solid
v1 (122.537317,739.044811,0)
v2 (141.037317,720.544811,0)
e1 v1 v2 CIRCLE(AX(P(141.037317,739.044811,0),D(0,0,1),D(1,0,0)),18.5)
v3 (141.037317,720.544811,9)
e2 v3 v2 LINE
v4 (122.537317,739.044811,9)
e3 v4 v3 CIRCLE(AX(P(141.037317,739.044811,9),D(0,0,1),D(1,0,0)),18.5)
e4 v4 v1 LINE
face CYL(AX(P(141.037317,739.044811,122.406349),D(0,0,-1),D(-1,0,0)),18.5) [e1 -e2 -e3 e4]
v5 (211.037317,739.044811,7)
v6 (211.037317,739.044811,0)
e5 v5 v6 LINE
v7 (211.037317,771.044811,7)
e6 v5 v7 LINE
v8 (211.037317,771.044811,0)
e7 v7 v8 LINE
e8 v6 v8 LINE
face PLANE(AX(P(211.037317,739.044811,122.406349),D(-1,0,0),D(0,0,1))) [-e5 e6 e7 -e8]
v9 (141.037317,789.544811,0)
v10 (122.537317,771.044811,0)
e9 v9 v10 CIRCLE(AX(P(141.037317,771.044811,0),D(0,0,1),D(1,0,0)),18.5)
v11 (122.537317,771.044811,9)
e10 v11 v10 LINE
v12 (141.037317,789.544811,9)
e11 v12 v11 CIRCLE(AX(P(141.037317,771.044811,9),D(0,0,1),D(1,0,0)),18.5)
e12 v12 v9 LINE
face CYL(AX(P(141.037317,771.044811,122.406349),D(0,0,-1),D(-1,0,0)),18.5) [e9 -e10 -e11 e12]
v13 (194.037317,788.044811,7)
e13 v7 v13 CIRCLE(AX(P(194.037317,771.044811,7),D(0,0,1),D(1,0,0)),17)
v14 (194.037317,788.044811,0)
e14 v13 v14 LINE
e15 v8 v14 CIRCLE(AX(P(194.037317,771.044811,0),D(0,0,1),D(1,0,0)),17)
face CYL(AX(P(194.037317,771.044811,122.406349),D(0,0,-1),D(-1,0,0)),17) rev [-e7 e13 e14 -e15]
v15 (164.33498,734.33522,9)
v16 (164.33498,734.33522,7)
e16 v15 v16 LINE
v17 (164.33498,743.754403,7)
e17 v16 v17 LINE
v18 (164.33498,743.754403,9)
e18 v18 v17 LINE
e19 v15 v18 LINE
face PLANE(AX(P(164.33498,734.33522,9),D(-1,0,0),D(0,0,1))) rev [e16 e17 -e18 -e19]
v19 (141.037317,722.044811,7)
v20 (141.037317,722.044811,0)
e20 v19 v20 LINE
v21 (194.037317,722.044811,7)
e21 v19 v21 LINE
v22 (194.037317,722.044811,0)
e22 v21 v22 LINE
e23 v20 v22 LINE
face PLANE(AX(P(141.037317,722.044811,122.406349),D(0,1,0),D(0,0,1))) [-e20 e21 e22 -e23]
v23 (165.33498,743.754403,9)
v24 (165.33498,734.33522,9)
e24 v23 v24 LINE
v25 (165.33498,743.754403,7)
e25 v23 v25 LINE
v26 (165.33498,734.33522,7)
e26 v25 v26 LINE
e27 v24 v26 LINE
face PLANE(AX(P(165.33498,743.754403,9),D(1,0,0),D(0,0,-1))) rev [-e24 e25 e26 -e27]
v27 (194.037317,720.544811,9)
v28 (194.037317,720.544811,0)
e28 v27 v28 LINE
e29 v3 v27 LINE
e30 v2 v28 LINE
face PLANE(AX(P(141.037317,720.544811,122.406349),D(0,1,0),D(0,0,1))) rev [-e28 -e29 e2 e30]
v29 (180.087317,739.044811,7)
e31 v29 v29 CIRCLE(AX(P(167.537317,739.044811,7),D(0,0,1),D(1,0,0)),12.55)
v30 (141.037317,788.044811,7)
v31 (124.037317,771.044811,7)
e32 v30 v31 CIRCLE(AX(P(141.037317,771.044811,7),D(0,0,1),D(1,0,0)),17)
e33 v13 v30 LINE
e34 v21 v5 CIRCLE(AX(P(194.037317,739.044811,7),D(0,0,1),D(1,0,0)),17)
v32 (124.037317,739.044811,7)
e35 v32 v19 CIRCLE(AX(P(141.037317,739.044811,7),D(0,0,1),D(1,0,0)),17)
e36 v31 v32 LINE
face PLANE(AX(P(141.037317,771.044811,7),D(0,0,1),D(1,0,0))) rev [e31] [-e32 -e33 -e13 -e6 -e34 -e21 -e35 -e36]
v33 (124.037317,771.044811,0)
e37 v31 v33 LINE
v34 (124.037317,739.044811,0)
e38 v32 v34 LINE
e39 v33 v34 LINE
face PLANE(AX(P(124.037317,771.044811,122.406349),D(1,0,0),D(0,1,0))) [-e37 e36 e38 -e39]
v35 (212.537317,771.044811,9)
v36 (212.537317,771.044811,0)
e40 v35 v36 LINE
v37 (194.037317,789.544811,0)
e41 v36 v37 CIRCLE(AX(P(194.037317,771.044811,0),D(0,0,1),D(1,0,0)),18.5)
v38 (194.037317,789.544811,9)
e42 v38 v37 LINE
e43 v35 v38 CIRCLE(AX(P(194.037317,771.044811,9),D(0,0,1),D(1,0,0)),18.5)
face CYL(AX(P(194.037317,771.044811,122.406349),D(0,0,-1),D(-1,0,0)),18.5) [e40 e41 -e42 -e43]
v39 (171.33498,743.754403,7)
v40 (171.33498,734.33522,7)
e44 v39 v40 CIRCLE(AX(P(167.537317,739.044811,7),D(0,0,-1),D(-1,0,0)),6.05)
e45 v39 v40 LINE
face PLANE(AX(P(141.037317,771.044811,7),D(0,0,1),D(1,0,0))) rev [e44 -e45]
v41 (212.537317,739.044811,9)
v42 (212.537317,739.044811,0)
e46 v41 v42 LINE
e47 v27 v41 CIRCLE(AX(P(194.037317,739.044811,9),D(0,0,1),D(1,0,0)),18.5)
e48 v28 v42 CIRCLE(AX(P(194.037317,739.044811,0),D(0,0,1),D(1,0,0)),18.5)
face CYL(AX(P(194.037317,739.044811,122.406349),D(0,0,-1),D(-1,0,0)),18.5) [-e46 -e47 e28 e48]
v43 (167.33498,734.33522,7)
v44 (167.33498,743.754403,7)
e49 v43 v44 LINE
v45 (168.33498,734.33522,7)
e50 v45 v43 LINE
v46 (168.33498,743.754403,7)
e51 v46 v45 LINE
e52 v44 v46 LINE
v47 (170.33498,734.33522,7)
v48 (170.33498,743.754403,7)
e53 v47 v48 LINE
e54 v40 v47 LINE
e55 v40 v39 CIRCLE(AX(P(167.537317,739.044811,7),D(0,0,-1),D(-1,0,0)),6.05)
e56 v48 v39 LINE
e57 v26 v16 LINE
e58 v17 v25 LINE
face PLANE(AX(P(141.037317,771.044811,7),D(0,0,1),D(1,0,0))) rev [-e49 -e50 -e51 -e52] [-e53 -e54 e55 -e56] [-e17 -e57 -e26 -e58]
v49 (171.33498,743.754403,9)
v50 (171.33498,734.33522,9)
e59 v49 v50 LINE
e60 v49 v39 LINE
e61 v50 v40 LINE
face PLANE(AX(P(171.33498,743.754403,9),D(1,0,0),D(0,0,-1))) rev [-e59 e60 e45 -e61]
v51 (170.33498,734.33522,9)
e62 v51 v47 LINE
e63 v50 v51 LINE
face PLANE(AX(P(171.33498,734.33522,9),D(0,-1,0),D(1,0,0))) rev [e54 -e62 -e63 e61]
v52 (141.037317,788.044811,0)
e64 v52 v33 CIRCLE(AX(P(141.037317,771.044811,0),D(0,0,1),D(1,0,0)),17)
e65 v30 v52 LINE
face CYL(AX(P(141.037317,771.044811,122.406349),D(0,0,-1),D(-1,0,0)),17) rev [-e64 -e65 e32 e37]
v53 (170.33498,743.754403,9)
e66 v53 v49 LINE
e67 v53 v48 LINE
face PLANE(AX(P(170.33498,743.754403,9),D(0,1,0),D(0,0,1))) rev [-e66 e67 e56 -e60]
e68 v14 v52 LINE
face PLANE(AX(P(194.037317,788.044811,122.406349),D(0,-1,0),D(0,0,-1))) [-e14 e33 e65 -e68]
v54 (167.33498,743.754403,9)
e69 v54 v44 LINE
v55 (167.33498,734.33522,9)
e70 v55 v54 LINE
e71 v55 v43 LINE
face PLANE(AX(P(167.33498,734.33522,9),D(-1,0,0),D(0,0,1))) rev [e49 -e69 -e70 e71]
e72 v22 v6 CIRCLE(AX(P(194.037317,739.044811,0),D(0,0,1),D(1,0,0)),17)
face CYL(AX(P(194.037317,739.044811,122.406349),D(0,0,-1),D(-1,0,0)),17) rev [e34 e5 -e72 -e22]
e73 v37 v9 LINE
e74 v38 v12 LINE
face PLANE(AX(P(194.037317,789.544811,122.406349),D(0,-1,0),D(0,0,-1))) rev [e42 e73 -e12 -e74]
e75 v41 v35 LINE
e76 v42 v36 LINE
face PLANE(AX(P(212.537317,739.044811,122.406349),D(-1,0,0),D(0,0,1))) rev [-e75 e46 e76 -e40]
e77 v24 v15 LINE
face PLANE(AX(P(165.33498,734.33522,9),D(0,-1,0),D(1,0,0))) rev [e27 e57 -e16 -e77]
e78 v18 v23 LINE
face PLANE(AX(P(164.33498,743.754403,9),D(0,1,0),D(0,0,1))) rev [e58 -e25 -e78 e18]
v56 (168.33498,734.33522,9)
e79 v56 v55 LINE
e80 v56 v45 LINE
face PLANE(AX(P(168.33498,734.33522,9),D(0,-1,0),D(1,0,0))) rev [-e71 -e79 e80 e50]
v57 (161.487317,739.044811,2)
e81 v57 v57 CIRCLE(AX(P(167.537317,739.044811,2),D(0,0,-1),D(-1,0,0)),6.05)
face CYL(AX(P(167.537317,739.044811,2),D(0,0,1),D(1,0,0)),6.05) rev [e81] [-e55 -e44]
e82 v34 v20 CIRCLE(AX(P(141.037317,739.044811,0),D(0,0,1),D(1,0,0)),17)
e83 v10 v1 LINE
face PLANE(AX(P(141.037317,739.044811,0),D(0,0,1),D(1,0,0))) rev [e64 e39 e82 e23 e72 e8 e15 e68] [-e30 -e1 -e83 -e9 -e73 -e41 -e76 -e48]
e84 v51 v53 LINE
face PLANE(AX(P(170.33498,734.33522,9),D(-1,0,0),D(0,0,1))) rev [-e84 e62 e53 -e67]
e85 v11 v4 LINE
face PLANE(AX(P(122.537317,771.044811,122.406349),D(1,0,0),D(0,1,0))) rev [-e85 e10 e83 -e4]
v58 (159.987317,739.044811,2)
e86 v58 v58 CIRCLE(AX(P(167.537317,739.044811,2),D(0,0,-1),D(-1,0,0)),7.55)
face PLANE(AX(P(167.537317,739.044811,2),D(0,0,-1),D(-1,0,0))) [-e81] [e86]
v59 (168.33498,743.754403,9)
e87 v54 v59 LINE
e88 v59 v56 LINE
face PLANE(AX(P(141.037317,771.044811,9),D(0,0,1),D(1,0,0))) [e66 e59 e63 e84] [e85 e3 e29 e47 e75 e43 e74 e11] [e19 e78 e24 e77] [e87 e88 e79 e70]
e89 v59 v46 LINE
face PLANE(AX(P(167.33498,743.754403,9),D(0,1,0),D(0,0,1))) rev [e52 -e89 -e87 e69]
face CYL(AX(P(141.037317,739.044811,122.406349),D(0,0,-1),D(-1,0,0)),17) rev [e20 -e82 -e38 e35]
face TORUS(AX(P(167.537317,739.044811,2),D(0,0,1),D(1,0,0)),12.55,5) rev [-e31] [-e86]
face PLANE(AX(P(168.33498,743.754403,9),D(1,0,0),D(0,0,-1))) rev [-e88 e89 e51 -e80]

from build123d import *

# Parameters (mm, degrees)
EXTRUDE_THIN1_DEPTH = 7
BOSS_EXTRUDE1_DEPTH = 2
SKETCH3_R           = 7.55
SKETCH3_R_2         = 6.05
EXTRUDE_THIN2_DEPTH = 5
FILLET1_R           = 5
SKETCH4_W           = 1
SKETCH4_H           = 9.419182822
CUT_EXTRUDE1_DEPTH  = 818.680940253


with BuildPart() as part:
    # Sketch1 → Extrude-Thin1 (new body)
    with BuildSketch(Plane.XY):
        with BuildLine():
            Line((122.537316884, 771.044811258), (122.537316884, 739.044811258))
            ThreePointArc((122.537316884, 739.044811258), (127.955841432, 725.963335806), (141.037316884, 720.544811258))
            Line((141.037316884, 720.544811258), (194.037316884, 720.544811258))
            ThreePointArc((194.037316884, 720.544811258), (207.118792336, 725.963335806), (212.537316884, 739.044811258))
            Line((212.537316884, 739.044811258), (212.537316884, 771.044811258))
            ThreePointArc((212.537316884, 771.044811258), (207.118792336, 784.12628671), (194.037316884, 789.544811258))
            Line((194.037316884, 789.544811258), (141.037316884, 789.544811258))
            ThreePointArc((141.037316884, 789.544811258), (127.955841432, 784.12628671), (122.537316884, 771.044811258))
        make_face()
        with BuildLine():
            Line((124.037316884, 771.044811258), (124.037316884, 739.044811258))
            ThreePointArc((124.037316884, 739.044811258), (129.016501604, 727.023995978), (141.037316884, 722.044811258))
            Line((141.037316884, 722.044811258), (194.037316884, 722.044811258))
            ThreePointArc((194.037316884, 722.044811258), (206.058132165, 727.023995978), (211.037316884, 739.044811258))
            Line((211.037316884, 739.044811258), (211.037316884, 771.044811258))
            ThreePointArc((211.037316884, 771.044811258), (206.058132165, 783.065626538), (194.037316884, 788.044811258))
            Line((194.037316884, 788.044811258), (141.037316884, 788.044811258))
            ThreePointArc((141.037316884, 788.044811258), (129.016501604, 783.065626538), (124.037316884, 771.044811258))
        make_face(mode=Mode.SUBTRACT)
    extrude(amount=EXTRUDE_THIN1_DEPTH)

    # Sketch2 → Boss-Extrude1 (add)
    with BuildSketch(Plane.XY.offset(7)):
        with BuildLine():
            Line((122.537316884, 771.044811258), (122.537316884, 739.044811258))
            ThreePointArc((122.537316884, 739.044811258), (127.955841432, 725.963335806), (141.037316884, 720.544811258))
            Line((141.037316884, 720.544811258), (194.037316884, 720.544811258))
            ThreePointArc((194.037316884, 720.544811258), (207.118792336, 725.963335806), (212.537316884, 739.044811258))
            Line((212.537316884, 739.044811258), (212.537316884, 771.044811258))
            ThreePointArc((212.537316884, 771.044811258), (207.118792336, 784.12628671), (194.037316884, 789.544811258))
            Line((194.037316884, 789.544811258), (141.037316884, 789.544811258))
            ThreePointArc((141.037316884, 789.544811258), (127.955841432, 784.12628671), (122.537316884, 771.044811258))
        make_face()
    extrude(amount=BOSS_EXTRUDE1_DEPTH)

    # Sketch3 → Extrude-Thin2 (add)
    with BuildSketch(Plane(origin=(0, 0, 7), x_dir=(-1, 0, 0), z_dir=(0, 0, -1))):
        with Locations((-167.537316884, 739.044811258)):
            Circle(SKETCH3_R)
        with Locations((-167.537316884, 739.044811258)):
            Circle(SKETCH3_R_2, mode=Mode.SUBTRACT)
    extrude(amount=EXTRUDE_THIN2_DEPTH)

    # Fillet1
    fillet1_edges = [part.edges().sort_by_distance(p)[0] for p in [
        (175.087316884, 739.044811258, 7),
    ]]
    fillet(fillet1_edges, radius=FILLET1_R - 0.0001)  # a hair under: the kernel refuses the full size

    # Sketch4 → Cut-Extrude1 (cut, through all)
    with BuildSketch(Plane(origin=(0, 0, 7), x_dir=(-1, 0, 0), z_dir=(0, 0, -1))):
        with Locations((-170.834980474, 739.044811258)):
            Rectangle(SKETCH4_W, SKETCH4_H)
        with Locations((-167.834980474, 739.044811258)):
            Rectangle(SKETCH4_W, SKETCH4_H)
        with Locations((-164.834980474, 739.044811258)):
            Rectangle(SKETCH4_W, SKETCH4_H)
    extrude(amount=-CUT_EXTRUDE1_DEPTH, mode=Mode.SUBTRACT)


solid = part.part
